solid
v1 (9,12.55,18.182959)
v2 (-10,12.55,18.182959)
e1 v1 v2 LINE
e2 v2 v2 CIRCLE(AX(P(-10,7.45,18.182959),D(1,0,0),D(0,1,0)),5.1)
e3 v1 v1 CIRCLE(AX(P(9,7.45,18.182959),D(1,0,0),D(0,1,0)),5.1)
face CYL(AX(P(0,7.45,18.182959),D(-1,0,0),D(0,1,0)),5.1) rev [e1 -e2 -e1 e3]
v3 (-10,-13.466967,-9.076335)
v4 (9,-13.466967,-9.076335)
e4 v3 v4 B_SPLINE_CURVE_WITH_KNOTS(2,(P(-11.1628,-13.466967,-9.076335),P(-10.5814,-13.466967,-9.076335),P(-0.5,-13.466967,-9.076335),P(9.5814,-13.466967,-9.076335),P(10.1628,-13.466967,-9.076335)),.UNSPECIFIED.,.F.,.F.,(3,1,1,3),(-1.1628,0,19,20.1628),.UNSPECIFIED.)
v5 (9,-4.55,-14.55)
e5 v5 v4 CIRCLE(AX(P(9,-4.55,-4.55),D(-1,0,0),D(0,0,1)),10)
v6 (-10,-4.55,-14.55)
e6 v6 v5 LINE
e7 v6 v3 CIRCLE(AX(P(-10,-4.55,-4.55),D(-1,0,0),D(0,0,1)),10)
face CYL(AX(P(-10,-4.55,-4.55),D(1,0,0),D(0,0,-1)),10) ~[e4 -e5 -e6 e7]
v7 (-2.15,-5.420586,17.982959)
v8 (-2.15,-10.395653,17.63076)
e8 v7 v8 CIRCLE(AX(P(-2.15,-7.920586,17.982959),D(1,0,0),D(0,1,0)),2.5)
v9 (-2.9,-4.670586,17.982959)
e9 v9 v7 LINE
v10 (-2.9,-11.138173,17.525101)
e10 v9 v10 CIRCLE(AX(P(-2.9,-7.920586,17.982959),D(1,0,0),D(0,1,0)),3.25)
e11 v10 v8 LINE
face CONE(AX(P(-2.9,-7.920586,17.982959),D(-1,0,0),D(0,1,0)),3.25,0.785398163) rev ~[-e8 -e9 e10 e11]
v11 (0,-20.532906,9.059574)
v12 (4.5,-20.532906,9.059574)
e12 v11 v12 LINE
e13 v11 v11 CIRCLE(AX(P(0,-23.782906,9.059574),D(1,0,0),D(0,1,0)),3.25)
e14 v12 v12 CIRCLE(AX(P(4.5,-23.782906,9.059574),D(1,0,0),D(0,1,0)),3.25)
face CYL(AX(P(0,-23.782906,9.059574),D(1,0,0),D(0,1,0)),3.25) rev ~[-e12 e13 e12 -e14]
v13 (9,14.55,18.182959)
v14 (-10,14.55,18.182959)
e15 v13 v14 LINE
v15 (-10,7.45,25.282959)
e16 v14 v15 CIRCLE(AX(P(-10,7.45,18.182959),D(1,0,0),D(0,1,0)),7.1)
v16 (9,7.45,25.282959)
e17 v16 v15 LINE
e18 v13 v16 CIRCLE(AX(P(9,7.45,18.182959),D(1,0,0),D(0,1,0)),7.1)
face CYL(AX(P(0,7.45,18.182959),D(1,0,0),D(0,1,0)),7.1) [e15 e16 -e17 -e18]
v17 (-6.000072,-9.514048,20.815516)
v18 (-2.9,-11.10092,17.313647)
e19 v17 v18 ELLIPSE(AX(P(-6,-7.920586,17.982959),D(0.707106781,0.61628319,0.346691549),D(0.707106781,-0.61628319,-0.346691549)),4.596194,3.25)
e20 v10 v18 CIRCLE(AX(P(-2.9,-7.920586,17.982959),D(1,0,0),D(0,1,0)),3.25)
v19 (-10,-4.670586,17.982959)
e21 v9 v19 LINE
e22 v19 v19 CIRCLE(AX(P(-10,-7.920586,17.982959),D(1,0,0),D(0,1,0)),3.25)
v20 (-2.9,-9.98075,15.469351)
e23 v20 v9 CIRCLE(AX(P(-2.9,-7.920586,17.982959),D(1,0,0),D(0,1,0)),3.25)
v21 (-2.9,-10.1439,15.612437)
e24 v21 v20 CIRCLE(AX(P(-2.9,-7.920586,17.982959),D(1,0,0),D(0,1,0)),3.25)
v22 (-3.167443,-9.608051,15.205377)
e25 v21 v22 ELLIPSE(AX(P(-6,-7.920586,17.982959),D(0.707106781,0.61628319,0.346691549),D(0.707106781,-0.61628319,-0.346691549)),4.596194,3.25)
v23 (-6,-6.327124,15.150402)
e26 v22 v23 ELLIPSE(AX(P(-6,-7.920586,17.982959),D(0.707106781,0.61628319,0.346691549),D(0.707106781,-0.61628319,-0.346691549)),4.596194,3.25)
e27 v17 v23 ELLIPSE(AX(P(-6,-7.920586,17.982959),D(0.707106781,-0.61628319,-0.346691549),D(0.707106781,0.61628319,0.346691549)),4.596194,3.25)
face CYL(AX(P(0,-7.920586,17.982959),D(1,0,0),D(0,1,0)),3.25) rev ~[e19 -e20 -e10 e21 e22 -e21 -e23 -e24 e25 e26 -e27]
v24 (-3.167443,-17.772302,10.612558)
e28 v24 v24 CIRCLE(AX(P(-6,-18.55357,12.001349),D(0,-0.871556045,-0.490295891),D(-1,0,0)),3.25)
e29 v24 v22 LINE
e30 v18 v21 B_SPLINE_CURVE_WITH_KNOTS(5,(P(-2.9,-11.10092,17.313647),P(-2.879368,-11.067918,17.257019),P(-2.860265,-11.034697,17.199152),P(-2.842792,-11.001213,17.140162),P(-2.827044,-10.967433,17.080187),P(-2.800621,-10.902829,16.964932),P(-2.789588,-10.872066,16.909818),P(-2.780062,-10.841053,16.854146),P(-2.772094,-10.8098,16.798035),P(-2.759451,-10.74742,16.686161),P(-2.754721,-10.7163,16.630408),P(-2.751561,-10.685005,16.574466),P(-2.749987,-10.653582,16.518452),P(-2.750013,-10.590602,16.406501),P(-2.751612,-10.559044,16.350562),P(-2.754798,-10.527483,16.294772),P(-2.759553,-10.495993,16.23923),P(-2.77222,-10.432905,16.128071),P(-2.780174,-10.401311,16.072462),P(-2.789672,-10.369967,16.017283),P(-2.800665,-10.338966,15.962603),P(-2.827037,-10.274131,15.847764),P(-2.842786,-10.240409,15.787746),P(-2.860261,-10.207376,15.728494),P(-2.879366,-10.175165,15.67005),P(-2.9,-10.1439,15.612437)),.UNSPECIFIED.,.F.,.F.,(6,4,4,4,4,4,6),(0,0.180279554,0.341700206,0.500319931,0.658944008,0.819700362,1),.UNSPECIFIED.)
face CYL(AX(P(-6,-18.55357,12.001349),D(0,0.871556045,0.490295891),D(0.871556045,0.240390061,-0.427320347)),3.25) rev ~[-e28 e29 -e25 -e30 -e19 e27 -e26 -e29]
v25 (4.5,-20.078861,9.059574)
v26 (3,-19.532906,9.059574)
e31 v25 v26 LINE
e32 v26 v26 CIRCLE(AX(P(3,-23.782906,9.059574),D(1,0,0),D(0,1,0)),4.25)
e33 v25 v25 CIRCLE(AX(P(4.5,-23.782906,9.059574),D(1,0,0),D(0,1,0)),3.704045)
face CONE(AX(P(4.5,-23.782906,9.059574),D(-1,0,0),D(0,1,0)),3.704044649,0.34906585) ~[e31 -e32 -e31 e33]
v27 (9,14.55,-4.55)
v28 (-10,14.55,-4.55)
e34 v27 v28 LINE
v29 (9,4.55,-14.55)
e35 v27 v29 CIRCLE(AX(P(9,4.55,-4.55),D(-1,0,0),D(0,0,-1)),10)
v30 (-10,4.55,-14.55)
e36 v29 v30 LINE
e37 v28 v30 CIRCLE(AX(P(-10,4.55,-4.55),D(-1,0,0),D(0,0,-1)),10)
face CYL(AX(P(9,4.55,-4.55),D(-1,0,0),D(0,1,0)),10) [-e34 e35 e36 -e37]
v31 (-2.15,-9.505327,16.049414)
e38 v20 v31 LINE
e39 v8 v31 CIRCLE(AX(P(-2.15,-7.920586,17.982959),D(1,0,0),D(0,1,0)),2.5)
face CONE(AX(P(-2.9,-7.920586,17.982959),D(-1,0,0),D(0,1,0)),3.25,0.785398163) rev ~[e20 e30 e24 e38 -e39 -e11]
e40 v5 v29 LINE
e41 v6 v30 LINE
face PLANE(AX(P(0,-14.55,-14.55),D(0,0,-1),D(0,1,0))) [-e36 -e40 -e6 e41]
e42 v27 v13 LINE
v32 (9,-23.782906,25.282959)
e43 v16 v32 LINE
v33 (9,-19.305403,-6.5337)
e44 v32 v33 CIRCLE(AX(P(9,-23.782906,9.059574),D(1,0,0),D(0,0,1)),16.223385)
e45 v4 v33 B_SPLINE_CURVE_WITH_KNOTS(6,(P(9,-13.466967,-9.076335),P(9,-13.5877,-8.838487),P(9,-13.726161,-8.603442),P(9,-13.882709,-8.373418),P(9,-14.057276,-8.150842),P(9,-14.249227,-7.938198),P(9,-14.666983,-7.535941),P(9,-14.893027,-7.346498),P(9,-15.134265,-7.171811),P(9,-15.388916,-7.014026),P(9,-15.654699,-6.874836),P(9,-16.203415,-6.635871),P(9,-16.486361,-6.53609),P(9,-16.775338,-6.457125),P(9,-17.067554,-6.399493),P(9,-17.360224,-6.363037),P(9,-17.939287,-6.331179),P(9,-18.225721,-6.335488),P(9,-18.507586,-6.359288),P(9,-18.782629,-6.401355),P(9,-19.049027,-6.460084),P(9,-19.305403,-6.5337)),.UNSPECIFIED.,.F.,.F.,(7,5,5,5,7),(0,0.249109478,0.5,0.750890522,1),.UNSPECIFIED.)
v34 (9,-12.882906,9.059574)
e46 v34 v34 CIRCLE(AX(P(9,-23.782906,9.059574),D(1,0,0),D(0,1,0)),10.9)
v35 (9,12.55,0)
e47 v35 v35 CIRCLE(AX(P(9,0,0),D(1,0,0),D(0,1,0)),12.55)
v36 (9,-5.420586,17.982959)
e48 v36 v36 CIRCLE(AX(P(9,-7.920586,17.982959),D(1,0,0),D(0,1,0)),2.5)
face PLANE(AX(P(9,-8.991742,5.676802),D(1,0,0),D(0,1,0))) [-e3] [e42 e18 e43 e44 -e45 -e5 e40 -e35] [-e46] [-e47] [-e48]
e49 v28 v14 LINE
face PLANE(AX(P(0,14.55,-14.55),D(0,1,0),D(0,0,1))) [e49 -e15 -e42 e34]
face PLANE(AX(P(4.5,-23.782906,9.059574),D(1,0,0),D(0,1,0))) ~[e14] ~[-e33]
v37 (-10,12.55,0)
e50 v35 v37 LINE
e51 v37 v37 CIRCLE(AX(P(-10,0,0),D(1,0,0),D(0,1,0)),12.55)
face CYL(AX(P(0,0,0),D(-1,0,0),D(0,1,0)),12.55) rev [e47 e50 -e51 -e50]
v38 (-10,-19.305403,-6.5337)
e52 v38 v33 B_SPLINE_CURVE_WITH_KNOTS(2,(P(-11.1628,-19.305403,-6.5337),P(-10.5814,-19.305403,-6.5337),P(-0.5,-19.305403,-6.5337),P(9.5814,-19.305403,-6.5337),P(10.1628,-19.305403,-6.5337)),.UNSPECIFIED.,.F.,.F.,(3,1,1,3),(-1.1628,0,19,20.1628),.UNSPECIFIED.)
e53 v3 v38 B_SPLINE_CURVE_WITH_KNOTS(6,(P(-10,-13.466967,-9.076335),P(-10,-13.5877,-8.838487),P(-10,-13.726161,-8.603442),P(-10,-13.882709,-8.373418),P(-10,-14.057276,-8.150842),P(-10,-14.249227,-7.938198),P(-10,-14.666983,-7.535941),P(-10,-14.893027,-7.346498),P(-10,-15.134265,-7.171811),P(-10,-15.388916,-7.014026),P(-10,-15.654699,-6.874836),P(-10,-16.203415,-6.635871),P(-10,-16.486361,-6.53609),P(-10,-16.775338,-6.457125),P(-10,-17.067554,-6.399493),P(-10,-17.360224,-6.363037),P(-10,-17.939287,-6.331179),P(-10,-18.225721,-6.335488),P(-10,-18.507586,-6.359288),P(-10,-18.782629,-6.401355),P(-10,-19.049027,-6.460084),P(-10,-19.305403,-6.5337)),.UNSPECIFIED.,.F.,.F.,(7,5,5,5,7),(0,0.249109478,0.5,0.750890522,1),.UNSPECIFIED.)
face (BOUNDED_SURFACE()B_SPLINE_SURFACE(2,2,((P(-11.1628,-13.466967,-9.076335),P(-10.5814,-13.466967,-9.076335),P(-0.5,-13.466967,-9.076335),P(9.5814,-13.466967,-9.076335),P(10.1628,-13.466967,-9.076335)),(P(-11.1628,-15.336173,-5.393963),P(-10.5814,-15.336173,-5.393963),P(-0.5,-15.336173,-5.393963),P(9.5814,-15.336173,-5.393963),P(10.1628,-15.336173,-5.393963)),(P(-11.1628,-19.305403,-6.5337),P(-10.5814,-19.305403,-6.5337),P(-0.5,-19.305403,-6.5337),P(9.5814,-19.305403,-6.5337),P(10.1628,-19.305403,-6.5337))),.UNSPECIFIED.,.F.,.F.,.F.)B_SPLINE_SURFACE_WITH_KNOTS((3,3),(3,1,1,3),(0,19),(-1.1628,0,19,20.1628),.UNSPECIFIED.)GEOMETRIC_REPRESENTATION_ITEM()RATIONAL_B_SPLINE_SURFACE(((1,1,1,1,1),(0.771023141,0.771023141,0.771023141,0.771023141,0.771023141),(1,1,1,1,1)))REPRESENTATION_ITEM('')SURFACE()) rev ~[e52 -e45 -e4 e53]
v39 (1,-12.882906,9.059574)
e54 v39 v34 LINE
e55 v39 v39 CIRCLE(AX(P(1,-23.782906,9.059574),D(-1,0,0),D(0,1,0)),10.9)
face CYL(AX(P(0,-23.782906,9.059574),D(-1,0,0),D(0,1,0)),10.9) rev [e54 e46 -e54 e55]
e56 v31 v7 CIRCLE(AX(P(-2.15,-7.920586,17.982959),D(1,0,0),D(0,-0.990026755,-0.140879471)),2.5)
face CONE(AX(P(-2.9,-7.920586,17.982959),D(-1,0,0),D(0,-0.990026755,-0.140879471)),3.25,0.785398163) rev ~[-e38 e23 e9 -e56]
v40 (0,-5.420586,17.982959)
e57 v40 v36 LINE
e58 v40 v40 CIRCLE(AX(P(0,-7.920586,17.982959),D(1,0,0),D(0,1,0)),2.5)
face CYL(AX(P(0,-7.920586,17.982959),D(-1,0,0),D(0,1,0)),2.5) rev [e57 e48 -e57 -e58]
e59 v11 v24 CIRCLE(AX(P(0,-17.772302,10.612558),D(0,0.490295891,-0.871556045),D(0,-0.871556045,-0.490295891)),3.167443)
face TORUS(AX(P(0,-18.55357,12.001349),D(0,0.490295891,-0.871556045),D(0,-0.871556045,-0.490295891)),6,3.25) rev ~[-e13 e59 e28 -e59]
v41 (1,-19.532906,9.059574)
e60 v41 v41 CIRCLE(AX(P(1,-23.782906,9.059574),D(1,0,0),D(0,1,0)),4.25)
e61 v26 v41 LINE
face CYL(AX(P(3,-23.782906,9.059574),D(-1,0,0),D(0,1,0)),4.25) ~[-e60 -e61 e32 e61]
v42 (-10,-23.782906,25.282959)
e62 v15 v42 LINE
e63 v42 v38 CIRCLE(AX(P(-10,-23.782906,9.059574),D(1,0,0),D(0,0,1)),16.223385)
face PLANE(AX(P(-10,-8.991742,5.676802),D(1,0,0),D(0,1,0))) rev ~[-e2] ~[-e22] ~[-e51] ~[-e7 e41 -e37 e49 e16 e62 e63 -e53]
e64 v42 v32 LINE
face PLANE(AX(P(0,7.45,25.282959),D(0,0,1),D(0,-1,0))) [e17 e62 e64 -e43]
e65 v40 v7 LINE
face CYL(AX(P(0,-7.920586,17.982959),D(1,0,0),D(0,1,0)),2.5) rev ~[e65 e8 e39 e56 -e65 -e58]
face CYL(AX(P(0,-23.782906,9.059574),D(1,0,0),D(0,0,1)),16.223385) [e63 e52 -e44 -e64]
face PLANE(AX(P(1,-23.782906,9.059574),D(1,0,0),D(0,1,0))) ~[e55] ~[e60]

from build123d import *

# Parameters (mm, degrees)
F0_R          = 12.55
F0_R_2        = 10.9
F0_R_3        = 3.25
F0_R_4        = 5.1
F0_R_5        = 2.5
F1_DEPTH      = 9
F2_DEPTH      = 10
F3_R          = 10
F4_R          = 5
F11_DEPTH     = 2.9
F10_R         = 3.25
F13_T4_ANGLE  = 230.6618088311
F13_S5_R      = 3.25
F13_T6_DEPTH  = 6
F13_T10_ANGLE = 171.9012593912
F13_S11_R     = 3.25
F13_T12_DEPTH = 5


# Not quite as in the source:
# - a fillet or chamfer that OpenCascade refuses, or shapes differently, is made with other operations: its cross-section is extruded or revolved along the edge and cut away or added


with BuildPart() as f1:
    # F0 (on Right) → F1 (new body)
    with BuildSketch(Plane.YZ):
        with BuildLine():
            Line((7.45, 25.2829590551), (-23.7829060836, 25.2829590551))
            ThreePointArc((-23.7829060836, 25.2829590551), (-39.2686382031, 4.2232189691), (-14.55, -4.280278967))
            Line((-14.55, -4.280278967), (-14.55, -14.55))
            Line((-14.55, -14.55), (14.55, -14.55))
            Line((14.55, -14.55), (14.55, 18.1829590551))
            ThreePointArc((14.55, 18.1829590551), (12.4704581464, 23.2034172015), (7.45, 25.2829590551))
        make_face()
        Circle(F0_R, mode=Mode.SUBTRACT)
        with Locations((-23.7829060836, 9.059573843)):
            Circle(F0_R_2, mode=Mode.SUBTRACT)
        with Locations((-7.9205860656, 17.9829590551)):
            Circle(F0_R_3, mode=Mode.SUBTRACT)
        with Locations((7.45, 18.1829590551)):
            Circle(F0_R_4, mode=Mode.SUBTRACT)
        with Locations((-7.9205860656, 17.9829590551)):
            Circle(F0_R_3)
        with Locations((-7.9205860656, 17.9829590551)):
            Circle(F0_R_5, mode=Mode.SUBTRACT)
    extrude(amount=F1_DEPTH)

    # F0 (on Right) → F2 (join)
    with BuildSketch(Plane.YZ):
        with BuildLine():
            Line((7.45, 25.2829590551), (-23.7829060836, 25.2829590551))
            ThreePointArc((-23.7829060836, 25.2829590551), (-39.2686382031, 4.2232189691), (-14.55, -4.280278967))
            Line((-14.55, -4.280278967), (-14.55, -14.55))
            Line((-14.55, -14.55), (14.55, -14.55))
            Line((14.55, -14.55), (14.55, 18.1829590551))
            ThreePointArc((14.55, 18.1829590551), (12.4704581464, 23.2034172015), (7.45, 25.2829590551))
        make_face()
        Circle(F0_R, mode=Mode.SUBTRACT)
        with Locations((-23.7829060836, 9.059573843)):
            Circle(F0_R_2, mode=Mode.SUBTRACT)
        with Locations((-7.9205860656, 17.9829590551)):
            Circle(F0_R_3, mode=Mode.SUBTRACT)
        with Locations((7.45, 18.1829590551)):
            Circle(F0_R_4, mode=Mode.SUBTRACT)
        with Locations((-23.7829060836, 9.059573843)):
            Circle(F0_R_2)
    extrude(amount=-F2_DEPTH)

    # F3
    f3_edges = [f1.edges().sort_by_distance(p)[0] for p in [
        (-0.5, -23.782906, 25.282959),
        (-0.5, 14.55, 18.182959),
        (-0.5, 7.45, 25.282959),
        (-0.5, -14.55, -14.55),
        (-0.5, 14.55, -14.55),
    ]]
    fillet(f3_edges, radius=F3_R)

    # F4
    f4_edges = [f1.edges().sort_by_distance(p)[0] for p in [
        (-0.5, -14.55, -4.280279),
    ]]
    fillet(f4_edges, radius=F4_R)

    # F7 (on plane+point) → F8 (revolve)
    with BuildSketch(Plane.XY.offset(9.059573843)):
        Polygon((1, -12.7829060836), (0, -12.7829060836), (0, -20.5329060836), (4.5, -20.5329060836), (4.5, -20.078861435), (3, -19.5329060836), (1, -19.5329060836), align=None)
    revolve(axis=Axis((4.5, -23.7829060836, 9.059573843), (1, 0, 0)))

    # F0 (on Right) → F11 (join)
    with BuildSketch(Plane.YZ):
        with Locations((-7.9205860656, 17.9829590551)):
            Circle(F0_R_3)
        with Locations((-7.9205860656, 17.9829590551)):
            Circle(F0_R_5, mode=Mode.SUBTRACT)
    extrude(amount=-F11_DEPTH)

    # F12: sweep along a path in F9
    with BuildLine(Plane(origin=(0, -9.5885144747, 17.044662029), x_dir=(1, 0, 0), z_dir=(0, 0.4902958908, -0.8715560449))) as f12_path:
        ThreePointArc((0, 16.2862637363), (-4.2426406871, 14.5289044234), (-6, 10.2862637363))
        Line((-6, 10.2862637363), (-6, -1.9137362637))
    # F10 (on face) → F12 (sweep, cut)
    with BuildSketch(Plane.YZ):
        with Locations((-23.7829060836, 9.059573843)):
            Circle(F10_R)
    sweep(path=f12_path.line, mode=Mode.SUBTRACT)

    # F13: chamfer of 0.75 on 1 edges, made by hand


with BuildPart() as f13_tool2:
    # F13_s3 → F13_t4 (revolve)
    with BuildSketch(Plane.XY.offset(17.9829590551)):
        Polygon((-2.9, -4.6705860656), (-2.15, -5.4205860656), (-2.9, -5.4205860656), align=None)
    revolve(axis=Axis((-2.9, -7.9205860656, 17.9829590551), (1, 0, 0)), revolution_arc=F13_T4_ANGLE)

    # F13_s5 → F13_t6 (intersect, symmetric)
    with BuildSketch(Plane.YZ.offset(-2.5)):
        with Locations((-7.9205860656, 17.9829590551)):
            Circle(F13_S5_R)
    extrude(amount=F13_T6_DEPTH, both=True, mode=Mode.INTERSECT)


with BuildPart() as f1_1:
    add(f1.part)

    # F13_t1: cut F13_tool2
    add(f13_tool2.part, mode=Mode.SUBTRACT)


with BuildPart() as f13_tool8:
    # F13_s9 → F13_t10 (revolve)
    with BuildSketch(Plane(origin=(0, -2.6653633076, 18.7307701592), x_dir=(1, 0, 0), z_dir=(0, -0.1408794707, 0.9900267546))):
        Polygon((-2.9, -8.558162364), (-2.15, -7.808162364), (-2.9, -7.808162364), align=None)
    revolve(axis=Axis((-2.9, -7.9205860656, 17.9829590551), (1, 0, 0)), revolution_arc=F13_T10_ANGLE)

    # F13_s11 → F13_t12 (intersect, symmetric)
    with BuildSketch(Plane.YZ.offset(-2.5)):
        with Locations((-7.9205860656, 17.9829590551)):
            Circle(F13_S11_R)
    extrude(amount=F13_T12_DEPTH, both=True, mode=Mode.INTERSECT)


with BuildPart() as f1_2:
    add(f1_1.part)

    # F13_t7: cut F13_tool8
    add(f13_tool8.part, mode=Mode.SUBTRACT)


solid = f1_2.part
